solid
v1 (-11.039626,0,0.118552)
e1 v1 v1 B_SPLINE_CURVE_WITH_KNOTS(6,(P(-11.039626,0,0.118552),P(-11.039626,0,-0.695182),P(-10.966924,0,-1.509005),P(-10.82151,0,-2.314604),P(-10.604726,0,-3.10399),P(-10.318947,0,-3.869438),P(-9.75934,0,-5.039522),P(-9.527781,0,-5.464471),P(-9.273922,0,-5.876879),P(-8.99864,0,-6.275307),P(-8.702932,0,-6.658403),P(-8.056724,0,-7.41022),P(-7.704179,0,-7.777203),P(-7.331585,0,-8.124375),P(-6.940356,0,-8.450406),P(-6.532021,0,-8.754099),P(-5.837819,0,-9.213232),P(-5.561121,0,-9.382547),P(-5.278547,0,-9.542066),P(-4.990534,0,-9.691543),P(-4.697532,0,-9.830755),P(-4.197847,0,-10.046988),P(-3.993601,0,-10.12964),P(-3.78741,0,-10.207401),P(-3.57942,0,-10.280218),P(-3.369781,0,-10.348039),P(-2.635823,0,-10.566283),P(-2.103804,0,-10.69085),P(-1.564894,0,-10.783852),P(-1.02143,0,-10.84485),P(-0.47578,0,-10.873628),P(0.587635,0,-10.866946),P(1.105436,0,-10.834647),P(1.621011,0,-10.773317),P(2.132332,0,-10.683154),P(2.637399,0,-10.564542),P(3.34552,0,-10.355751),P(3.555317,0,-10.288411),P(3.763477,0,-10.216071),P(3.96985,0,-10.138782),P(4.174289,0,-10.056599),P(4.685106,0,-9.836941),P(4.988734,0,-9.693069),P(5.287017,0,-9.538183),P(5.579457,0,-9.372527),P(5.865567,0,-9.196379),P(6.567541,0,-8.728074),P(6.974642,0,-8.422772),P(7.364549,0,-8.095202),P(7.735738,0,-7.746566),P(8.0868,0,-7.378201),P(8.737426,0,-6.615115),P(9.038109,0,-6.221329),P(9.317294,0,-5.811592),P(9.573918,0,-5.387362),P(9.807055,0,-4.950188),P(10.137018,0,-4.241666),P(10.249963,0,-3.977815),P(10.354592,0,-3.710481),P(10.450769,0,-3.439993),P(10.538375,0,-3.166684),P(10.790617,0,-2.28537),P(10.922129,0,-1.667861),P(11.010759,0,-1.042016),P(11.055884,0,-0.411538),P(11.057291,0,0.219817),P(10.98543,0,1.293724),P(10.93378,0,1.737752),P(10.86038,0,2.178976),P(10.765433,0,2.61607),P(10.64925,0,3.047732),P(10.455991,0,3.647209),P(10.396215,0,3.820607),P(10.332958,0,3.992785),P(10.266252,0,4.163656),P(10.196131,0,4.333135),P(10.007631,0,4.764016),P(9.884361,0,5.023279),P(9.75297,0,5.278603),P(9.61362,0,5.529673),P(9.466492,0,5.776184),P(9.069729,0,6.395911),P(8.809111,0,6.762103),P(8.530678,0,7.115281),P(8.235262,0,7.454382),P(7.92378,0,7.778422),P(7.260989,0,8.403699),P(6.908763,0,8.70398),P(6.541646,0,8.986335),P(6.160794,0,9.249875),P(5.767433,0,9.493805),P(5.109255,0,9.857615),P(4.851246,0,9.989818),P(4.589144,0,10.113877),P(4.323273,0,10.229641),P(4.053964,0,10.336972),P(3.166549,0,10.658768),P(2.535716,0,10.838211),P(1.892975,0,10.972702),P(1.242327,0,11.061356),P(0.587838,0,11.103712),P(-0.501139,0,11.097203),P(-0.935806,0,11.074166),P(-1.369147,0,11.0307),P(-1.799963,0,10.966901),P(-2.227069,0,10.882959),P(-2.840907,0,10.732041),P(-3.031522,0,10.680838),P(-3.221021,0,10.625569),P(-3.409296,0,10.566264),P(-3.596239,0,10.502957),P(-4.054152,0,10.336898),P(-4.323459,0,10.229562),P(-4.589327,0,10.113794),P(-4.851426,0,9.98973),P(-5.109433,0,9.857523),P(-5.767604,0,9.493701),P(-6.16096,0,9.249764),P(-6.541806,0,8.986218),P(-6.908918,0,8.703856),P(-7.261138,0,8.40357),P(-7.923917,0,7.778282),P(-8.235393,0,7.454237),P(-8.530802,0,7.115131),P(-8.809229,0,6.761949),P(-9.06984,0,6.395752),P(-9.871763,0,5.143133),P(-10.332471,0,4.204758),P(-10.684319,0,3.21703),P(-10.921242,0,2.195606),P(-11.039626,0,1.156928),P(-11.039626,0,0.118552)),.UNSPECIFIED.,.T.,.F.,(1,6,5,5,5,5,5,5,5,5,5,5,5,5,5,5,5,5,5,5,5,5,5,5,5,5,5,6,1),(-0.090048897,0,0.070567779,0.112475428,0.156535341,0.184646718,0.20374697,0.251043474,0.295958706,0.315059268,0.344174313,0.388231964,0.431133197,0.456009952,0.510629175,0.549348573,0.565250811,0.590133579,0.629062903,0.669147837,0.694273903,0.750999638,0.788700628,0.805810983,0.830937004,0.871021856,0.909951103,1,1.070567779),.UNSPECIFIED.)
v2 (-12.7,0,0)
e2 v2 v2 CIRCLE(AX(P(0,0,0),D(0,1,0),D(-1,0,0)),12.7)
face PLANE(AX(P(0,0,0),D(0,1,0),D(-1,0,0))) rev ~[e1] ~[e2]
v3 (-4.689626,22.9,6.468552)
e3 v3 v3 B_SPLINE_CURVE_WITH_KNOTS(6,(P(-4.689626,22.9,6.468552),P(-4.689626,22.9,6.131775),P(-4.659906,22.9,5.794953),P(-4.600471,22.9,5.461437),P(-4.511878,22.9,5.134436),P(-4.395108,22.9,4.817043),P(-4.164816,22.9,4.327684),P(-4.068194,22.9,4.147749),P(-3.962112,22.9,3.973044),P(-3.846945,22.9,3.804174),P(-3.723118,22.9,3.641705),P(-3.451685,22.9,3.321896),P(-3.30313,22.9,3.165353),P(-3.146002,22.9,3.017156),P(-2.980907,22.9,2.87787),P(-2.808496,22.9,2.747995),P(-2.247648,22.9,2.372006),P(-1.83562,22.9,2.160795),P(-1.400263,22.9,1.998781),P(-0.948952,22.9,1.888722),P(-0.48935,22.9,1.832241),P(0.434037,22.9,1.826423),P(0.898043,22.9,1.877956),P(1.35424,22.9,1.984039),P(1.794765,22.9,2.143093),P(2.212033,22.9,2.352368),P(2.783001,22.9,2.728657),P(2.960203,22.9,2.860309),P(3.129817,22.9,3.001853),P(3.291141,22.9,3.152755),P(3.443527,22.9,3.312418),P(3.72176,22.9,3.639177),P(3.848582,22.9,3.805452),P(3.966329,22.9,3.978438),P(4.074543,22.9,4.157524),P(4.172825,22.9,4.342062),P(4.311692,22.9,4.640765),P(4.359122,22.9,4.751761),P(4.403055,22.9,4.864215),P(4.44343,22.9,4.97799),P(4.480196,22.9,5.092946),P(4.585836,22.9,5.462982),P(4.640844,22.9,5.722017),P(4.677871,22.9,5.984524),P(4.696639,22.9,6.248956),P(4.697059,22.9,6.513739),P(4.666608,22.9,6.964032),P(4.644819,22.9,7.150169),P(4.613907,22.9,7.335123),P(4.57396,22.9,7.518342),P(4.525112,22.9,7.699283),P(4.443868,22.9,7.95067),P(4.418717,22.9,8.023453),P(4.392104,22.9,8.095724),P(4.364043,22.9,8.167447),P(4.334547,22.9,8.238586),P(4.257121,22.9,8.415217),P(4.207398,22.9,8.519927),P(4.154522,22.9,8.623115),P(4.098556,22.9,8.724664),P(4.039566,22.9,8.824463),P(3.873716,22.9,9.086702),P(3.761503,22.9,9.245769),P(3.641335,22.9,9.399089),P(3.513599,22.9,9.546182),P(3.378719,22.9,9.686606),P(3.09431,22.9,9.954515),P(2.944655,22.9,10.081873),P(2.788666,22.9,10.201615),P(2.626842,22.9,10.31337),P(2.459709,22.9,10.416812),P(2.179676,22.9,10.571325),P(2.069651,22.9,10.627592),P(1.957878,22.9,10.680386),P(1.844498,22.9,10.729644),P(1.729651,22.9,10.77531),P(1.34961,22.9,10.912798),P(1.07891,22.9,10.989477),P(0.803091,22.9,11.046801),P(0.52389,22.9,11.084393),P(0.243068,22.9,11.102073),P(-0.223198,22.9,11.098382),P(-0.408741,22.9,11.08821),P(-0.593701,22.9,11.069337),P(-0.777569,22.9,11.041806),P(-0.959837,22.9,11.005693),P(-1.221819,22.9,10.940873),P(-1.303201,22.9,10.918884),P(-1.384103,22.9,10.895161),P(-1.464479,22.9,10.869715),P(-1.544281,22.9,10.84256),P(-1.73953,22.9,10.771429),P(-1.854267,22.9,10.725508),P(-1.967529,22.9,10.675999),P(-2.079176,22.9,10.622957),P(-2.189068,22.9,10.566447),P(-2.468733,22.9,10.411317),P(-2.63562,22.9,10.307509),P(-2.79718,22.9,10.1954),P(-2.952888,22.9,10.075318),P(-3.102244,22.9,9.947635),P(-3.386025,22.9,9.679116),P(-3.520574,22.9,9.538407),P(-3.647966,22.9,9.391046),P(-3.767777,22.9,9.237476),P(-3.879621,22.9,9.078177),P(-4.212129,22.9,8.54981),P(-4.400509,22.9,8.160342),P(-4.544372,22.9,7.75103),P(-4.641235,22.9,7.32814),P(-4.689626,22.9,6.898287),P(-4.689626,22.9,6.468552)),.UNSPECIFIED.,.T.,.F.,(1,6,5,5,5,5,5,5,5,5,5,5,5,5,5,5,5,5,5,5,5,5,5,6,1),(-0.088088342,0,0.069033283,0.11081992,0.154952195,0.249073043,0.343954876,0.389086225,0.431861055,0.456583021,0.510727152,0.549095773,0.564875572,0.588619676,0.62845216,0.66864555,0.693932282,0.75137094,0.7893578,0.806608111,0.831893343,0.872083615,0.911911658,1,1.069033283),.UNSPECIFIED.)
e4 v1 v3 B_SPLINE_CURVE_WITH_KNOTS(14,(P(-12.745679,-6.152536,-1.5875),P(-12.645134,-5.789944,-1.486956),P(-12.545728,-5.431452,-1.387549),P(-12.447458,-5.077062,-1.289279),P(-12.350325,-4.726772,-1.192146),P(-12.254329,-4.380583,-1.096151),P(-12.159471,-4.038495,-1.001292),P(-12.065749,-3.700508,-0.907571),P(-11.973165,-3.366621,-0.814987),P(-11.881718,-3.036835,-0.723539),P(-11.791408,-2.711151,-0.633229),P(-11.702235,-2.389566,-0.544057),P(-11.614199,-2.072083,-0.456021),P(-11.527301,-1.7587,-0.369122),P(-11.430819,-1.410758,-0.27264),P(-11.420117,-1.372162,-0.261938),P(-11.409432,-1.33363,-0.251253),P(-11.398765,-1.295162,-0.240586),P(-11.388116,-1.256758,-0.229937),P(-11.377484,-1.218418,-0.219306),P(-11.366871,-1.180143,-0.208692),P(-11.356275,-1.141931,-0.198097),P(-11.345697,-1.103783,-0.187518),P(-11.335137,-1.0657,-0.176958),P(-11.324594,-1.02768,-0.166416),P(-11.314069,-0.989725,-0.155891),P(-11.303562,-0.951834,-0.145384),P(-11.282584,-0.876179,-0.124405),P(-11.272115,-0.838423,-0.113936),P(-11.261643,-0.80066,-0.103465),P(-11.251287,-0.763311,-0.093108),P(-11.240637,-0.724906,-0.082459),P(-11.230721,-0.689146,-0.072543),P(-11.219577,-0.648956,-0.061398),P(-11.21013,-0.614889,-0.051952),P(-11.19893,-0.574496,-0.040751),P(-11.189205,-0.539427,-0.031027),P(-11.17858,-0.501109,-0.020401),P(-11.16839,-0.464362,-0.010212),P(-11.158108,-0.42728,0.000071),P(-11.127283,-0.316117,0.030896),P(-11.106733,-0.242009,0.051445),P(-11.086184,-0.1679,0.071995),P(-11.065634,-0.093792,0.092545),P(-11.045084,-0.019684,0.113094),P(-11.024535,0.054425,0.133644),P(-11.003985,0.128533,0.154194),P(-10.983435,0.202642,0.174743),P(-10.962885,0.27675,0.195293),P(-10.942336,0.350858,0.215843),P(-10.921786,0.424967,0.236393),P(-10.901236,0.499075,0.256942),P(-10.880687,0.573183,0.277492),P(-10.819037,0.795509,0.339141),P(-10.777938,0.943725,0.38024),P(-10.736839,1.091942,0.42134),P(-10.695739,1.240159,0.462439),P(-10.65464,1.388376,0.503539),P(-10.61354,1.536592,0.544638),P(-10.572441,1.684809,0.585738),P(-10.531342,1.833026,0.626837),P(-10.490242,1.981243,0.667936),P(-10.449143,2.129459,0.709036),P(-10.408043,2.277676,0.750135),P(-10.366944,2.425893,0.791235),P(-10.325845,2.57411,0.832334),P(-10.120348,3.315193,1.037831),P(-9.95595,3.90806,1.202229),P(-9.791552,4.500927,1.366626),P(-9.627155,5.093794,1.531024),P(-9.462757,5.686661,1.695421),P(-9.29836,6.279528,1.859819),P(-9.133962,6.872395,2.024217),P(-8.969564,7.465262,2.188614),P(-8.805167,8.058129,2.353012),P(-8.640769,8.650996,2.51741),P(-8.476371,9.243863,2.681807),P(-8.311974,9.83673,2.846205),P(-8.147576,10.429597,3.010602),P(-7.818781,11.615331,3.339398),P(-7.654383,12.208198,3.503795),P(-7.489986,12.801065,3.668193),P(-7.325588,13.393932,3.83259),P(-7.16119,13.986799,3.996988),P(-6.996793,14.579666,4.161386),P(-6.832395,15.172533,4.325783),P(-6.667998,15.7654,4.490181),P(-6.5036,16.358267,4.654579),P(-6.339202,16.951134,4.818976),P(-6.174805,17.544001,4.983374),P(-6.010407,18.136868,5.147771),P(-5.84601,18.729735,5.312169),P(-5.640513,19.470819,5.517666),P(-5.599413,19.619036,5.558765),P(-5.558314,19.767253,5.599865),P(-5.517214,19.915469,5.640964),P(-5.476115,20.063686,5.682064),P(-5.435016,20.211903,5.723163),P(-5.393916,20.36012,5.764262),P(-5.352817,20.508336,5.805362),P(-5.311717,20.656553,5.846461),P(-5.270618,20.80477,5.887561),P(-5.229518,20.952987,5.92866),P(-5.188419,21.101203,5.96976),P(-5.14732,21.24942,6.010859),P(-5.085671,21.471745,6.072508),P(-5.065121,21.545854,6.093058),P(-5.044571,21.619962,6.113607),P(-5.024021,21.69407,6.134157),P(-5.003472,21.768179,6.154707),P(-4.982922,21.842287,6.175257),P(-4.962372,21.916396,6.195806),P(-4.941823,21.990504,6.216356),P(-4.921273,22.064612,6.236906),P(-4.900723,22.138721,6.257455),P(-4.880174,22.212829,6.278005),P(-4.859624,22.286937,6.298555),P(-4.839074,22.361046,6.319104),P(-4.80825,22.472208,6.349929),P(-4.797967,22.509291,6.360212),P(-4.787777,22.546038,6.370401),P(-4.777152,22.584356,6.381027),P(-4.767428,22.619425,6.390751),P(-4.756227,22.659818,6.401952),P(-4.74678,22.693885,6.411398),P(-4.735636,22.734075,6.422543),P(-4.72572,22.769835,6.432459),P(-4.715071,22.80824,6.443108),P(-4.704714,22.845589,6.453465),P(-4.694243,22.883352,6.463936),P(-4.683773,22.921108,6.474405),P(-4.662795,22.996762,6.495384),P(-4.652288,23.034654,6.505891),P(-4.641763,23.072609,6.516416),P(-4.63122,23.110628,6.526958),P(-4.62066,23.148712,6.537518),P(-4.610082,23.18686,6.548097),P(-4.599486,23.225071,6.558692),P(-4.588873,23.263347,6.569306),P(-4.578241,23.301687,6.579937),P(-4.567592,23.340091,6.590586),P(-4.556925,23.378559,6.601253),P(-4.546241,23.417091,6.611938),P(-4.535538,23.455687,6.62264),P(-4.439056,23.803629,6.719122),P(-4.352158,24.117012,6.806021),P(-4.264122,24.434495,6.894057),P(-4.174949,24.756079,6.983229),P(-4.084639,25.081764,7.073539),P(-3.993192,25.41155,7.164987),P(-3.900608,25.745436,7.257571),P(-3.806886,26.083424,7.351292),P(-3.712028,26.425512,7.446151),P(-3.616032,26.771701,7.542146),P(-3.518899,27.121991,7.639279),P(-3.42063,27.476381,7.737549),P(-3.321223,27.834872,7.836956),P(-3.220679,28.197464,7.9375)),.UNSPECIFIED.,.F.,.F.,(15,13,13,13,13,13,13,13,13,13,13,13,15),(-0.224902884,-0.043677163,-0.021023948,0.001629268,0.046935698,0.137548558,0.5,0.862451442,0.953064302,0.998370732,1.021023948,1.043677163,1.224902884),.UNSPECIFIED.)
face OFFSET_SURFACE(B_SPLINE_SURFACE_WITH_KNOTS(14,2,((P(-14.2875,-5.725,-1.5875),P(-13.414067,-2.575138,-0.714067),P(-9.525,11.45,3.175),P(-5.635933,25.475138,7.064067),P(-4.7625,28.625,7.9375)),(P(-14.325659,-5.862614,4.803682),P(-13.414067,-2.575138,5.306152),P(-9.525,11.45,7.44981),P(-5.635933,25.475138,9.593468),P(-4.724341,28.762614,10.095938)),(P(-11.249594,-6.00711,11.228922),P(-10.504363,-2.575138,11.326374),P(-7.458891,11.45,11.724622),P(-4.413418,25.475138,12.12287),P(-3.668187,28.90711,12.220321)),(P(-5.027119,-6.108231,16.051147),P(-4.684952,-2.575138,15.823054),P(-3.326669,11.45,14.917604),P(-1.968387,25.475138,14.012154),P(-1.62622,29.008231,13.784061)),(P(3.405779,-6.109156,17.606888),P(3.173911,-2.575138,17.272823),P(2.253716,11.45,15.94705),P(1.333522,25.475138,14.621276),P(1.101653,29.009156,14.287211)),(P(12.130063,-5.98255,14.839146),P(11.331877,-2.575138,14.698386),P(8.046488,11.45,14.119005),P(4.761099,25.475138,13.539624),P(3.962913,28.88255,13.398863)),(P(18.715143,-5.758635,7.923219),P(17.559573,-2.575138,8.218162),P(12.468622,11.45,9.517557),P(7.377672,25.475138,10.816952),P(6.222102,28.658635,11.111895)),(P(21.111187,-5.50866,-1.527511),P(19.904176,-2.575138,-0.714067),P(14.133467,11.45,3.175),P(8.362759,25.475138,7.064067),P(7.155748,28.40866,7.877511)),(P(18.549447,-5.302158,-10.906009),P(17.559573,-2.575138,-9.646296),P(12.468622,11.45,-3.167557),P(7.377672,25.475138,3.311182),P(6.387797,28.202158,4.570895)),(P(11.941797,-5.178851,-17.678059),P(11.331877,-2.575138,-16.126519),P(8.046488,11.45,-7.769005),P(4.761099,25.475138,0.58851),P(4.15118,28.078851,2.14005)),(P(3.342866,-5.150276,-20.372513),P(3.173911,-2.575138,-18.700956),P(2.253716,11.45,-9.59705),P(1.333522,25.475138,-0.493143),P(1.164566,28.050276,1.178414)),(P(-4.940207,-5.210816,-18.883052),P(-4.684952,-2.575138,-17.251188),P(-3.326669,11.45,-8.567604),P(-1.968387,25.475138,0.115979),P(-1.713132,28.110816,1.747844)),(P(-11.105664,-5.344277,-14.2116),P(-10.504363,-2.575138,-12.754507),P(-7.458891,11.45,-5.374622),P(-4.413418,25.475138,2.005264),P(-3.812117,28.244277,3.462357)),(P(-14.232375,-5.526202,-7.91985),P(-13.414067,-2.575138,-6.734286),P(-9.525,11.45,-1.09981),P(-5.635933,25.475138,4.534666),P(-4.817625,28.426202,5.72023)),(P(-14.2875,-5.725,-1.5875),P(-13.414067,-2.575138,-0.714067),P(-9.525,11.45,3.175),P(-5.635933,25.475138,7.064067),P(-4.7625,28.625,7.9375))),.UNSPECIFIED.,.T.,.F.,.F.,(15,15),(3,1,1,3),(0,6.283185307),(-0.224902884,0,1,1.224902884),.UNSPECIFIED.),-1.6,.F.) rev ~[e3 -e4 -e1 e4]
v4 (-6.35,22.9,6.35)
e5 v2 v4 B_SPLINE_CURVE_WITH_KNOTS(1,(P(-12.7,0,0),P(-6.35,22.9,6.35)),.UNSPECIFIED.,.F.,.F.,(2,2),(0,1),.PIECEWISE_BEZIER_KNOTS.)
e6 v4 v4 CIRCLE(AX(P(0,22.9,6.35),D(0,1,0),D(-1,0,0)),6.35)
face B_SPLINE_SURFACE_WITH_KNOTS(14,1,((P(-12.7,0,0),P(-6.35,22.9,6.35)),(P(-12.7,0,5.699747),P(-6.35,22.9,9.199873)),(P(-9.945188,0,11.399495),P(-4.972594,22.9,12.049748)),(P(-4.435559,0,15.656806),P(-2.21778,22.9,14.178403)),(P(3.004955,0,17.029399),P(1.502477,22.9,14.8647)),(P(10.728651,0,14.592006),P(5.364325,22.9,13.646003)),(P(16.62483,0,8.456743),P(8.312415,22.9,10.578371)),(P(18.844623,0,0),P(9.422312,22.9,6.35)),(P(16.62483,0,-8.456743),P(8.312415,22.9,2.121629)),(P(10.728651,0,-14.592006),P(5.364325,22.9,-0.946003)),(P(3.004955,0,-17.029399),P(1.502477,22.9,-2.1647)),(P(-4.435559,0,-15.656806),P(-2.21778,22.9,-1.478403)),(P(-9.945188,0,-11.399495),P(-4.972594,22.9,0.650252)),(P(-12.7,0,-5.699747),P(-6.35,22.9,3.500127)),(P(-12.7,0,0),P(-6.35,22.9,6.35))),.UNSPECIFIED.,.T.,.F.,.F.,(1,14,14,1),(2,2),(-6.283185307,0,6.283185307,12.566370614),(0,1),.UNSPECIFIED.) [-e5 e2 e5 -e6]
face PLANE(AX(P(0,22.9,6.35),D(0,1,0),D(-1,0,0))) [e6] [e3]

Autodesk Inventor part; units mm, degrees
ref_plane "YZ Plane" through (0, 0, 0) normal (1, 0, 0) x (0, 1, 0)
ref_plane "XY Plane" through (0, 0, 0) normal (0, 0, 1) x (1, 0, 0)
sketch "Szkic6" plane through (0, 0, 0) normal (0, 1, 0) x (-1, 0, 0)
  circle A0 centre (0, 0) radius 12.7
  dimension "d33" = 25.4
ref_plane "Płaszczyzna konstrukcyjna1" through (0, 22.9, 0) normal (0, 1, 0) x (-1, 0, 0)
sketch "Szkic7" plane through (0, 22.9, 0) normal (0, 1, 0) x (-1, 0, 0)
  circle A0 centre (0, 6.35) radius 6.35
  line L0 (0, -20.3) -> (0, 20.3) construction
  circle A1 centre (0, 0) radius 12.7 construction
  dimension "d35" = 12.7
loft "Wyciągnięcie złożone1" add profiles "Szkic6", "Szkic7"
shell "Skorupa1" thickness 1.6 removed faces 2 at (1.0404, 22.9, 6.7582) at (3.6254, 0, -0.9542)
equation "\"d33\" = OD1"
equation "\"d35\" = OD2"
equation "\"d52\" = THK"
equation "\"SzerokośćGięciaPodcięcia\" = Grubość"
equation "\"RozmiarPodcięciaNarożnika\" = 4 * Grubość"
equation "\"PromieńPrzejścia\" = PromieńGięcia"
equation "\"Rozmiar_promienia_Jacobiego\" = PromieńGięcia"
equation "\"Wielk_odstępu\" = Grubość"
equation "\"d2\" = PromieńGięcia"
equation "\"d23\" = PromieńGięcia"
equation "\"OD1\" = 25.4"
equation "\"OD2\" = 12.7"
equation "\"L\" = 22.9"
equation "\"THK\" = 1.6"
equation "\"d34\" = L"
equation "\"Grubość\" = 1.5"
equation "\"PromieńGięcia\" = 3"
properties part number "Redukcja asymetryczna Ø25,4x12,7x1,6 L=22,9" material "304"
